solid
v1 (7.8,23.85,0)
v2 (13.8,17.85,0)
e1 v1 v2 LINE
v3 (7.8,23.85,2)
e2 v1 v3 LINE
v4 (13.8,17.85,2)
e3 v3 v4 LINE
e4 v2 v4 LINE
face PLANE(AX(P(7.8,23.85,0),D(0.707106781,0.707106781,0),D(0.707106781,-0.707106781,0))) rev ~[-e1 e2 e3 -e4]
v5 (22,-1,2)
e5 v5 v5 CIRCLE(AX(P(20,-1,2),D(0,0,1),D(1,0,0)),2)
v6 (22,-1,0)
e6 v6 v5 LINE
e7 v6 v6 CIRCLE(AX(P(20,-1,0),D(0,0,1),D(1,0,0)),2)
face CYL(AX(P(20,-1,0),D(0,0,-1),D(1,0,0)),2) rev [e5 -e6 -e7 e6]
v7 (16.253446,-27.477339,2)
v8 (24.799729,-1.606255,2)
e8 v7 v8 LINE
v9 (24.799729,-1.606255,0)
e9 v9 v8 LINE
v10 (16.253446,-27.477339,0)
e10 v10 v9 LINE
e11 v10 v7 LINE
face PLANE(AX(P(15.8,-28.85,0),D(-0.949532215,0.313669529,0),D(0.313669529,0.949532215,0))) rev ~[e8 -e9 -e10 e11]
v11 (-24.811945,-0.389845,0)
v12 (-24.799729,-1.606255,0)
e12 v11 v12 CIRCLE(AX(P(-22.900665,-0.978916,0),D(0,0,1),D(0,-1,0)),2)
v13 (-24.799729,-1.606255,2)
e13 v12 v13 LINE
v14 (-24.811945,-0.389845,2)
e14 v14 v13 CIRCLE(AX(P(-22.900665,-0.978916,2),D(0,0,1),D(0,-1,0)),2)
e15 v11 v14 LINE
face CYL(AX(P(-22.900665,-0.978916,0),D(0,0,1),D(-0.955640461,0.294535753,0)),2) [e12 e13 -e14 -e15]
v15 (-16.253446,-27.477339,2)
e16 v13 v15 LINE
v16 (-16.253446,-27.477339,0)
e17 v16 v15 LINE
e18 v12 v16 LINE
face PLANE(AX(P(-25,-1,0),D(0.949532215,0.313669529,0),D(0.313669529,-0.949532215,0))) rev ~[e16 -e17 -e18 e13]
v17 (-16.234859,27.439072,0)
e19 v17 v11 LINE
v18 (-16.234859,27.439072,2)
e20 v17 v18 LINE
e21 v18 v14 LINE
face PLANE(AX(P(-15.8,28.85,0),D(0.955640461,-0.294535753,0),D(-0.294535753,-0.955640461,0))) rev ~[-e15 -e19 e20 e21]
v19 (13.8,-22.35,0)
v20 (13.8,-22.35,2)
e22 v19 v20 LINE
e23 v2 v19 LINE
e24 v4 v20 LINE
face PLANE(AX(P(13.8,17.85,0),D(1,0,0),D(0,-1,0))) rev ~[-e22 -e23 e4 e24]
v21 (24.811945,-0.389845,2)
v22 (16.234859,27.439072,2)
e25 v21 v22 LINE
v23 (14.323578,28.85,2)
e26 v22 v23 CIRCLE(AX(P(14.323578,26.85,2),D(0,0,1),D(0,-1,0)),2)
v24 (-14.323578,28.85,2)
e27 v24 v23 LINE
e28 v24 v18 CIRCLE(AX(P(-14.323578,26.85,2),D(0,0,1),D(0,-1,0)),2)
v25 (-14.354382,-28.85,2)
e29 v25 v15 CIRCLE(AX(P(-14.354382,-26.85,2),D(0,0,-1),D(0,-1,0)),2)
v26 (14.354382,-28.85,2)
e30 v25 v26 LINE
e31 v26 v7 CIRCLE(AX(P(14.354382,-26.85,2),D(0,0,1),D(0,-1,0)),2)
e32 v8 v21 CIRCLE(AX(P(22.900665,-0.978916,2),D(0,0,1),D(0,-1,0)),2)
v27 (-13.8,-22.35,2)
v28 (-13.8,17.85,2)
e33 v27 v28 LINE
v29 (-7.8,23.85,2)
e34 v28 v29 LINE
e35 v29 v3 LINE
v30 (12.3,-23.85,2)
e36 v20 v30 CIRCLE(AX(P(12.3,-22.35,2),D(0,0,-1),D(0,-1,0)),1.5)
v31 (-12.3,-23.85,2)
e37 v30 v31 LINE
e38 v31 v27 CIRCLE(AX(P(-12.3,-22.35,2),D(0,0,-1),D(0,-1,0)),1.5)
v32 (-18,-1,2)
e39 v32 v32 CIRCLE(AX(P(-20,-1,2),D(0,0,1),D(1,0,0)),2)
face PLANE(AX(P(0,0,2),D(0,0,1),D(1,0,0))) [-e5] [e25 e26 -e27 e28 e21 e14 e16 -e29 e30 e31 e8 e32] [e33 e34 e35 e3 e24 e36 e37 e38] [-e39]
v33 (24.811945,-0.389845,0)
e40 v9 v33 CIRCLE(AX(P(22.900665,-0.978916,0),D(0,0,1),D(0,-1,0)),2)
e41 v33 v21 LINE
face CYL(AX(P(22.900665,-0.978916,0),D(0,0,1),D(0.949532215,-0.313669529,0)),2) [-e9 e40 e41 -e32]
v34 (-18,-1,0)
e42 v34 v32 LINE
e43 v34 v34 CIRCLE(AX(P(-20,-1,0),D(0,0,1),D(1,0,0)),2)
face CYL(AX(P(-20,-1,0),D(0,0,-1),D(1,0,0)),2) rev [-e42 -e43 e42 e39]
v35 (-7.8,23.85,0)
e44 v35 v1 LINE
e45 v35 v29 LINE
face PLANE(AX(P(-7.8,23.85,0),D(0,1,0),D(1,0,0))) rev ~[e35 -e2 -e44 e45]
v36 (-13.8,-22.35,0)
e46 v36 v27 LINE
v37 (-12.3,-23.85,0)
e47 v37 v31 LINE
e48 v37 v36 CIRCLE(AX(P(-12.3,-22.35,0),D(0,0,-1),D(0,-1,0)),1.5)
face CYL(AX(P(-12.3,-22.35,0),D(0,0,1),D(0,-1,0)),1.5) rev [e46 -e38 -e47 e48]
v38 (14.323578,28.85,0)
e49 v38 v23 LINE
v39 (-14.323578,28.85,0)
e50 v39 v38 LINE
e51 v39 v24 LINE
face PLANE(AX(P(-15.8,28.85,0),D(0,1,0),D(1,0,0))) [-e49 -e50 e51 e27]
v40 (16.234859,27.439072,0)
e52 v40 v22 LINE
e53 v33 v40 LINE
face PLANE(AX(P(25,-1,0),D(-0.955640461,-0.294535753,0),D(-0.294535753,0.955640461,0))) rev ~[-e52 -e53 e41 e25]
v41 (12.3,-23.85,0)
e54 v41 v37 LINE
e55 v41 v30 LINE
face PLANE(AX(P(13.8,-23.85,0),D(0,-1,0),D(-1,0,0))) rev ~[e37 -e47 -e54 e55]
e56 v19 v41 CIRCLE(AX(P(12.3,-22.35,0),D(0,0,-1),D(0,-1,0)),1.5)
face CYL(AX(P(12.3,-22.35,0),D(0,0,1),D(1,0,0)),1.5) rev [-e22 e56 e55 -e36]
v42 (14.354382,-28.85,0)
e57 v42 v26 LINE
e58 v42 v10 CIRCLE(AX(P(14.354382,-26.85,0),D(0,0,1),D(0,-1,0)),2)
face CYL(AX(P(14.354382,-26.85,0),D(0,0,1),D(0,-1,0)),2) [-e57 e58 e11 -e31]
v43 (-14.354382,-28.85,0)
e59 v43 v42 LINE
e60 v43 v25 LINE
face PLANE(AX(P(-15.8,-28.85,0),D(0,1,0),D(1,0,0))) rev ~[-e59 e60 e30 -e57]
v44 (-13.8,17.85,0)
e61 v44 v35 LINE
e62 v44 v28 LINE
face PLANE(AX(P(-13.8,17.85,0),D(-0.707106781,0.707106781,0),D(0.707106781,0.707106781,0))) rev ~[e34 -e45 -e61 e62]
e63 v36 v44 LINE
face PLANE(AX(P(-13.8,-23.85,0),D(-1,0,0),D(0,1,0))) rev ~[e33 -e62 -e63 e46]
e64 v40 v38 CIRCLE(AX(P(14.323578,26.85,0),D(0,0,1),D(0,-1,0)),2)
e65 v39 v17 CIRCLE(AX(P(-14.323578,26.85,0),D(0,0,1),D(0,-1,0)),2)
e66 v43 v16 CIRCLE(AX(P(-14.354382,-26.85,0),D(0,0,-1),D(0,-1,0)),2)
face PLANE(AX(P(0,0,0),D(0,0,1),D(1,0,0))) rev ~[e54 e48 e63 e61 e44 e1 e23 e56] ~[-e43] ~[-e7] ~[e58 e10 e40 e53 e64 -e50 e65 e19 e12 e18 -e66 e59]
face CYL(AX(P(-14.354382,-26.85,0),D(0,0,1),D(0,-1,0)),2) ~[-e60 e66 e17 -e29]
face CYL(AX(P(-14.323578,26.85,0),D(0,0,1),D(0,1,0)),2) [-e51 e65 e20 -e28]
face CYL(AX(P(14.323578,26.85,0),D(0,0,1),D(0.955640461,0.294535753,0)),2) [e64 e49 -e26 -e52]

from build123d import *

# Parameters (mm, degrees)
F0_W     = 31.6
F0_H     = 57.7
F0_R     = 2
F1_DEPTH = 2
F2_R     = 1.5
F3_R     = 2


# Not quite as in the source:
# - a feature names something its author has since deleted; it is built from what else it names


with BuildPart() as f1:
    # F0 (on Top) → F1 (new body)
    with BuildSketch(Plane.XY):
        Rectangle(F0_W, F0_H)
        Polygon((7.8, 23.85), (13.8, 23.85), (13.8, 17.85), (13.8, -23.85), (-13.8, -23.85), (-13.8, 17.85), (-13.8, 23.85), (-7.8, 23.85), align=None, mode=Mode.SUBTRACT)
        Polygon((-15.8, -28.85), (-15.8, 28.85), (-25, -1), align=None)
        with Locations((-20, -1)):
            Circle(F0_R, mode=Mode.SUBTRACT)
        Polygon((25, -1), (15.8, 28.85), (15.8, -28.85), align=None)
        with Locations((20, -1)):
            Circle(F0_R, mode=Mode.SUBTRACT)
        Polygon((-13.8, 17.85), (-7.8, 23.85), (-13.8, 23.85), align=None)
        Polygon((13.8, 17.85), (13.8, 23.85), (7.8, 23.85), align=None)
    extrude(amount=F1_DEPTH)

    # F2
    f2_edges = [f1.edges().sort_by_distance(p)[0] for p in [
        (13.8, -23.85, 1),
        (-13.8, -23.85, 1),
    ]]
    fillet(f2_edges, radius=F2_R)

    # F3
    f3_edges = [f1.edges().sort_by_distance(p)[0] for p in [
        (15.8, -28.85, 1),
        (-15.8, -28.85, 1),
        (25, -1, 1),
        (15.8, 28.85, 1),
        (-15.8, 28.85, 1),
        (-25, -1, 1),
    ]]
    fillet(f3_edges, radius=F3_R)


solid = f1.part
